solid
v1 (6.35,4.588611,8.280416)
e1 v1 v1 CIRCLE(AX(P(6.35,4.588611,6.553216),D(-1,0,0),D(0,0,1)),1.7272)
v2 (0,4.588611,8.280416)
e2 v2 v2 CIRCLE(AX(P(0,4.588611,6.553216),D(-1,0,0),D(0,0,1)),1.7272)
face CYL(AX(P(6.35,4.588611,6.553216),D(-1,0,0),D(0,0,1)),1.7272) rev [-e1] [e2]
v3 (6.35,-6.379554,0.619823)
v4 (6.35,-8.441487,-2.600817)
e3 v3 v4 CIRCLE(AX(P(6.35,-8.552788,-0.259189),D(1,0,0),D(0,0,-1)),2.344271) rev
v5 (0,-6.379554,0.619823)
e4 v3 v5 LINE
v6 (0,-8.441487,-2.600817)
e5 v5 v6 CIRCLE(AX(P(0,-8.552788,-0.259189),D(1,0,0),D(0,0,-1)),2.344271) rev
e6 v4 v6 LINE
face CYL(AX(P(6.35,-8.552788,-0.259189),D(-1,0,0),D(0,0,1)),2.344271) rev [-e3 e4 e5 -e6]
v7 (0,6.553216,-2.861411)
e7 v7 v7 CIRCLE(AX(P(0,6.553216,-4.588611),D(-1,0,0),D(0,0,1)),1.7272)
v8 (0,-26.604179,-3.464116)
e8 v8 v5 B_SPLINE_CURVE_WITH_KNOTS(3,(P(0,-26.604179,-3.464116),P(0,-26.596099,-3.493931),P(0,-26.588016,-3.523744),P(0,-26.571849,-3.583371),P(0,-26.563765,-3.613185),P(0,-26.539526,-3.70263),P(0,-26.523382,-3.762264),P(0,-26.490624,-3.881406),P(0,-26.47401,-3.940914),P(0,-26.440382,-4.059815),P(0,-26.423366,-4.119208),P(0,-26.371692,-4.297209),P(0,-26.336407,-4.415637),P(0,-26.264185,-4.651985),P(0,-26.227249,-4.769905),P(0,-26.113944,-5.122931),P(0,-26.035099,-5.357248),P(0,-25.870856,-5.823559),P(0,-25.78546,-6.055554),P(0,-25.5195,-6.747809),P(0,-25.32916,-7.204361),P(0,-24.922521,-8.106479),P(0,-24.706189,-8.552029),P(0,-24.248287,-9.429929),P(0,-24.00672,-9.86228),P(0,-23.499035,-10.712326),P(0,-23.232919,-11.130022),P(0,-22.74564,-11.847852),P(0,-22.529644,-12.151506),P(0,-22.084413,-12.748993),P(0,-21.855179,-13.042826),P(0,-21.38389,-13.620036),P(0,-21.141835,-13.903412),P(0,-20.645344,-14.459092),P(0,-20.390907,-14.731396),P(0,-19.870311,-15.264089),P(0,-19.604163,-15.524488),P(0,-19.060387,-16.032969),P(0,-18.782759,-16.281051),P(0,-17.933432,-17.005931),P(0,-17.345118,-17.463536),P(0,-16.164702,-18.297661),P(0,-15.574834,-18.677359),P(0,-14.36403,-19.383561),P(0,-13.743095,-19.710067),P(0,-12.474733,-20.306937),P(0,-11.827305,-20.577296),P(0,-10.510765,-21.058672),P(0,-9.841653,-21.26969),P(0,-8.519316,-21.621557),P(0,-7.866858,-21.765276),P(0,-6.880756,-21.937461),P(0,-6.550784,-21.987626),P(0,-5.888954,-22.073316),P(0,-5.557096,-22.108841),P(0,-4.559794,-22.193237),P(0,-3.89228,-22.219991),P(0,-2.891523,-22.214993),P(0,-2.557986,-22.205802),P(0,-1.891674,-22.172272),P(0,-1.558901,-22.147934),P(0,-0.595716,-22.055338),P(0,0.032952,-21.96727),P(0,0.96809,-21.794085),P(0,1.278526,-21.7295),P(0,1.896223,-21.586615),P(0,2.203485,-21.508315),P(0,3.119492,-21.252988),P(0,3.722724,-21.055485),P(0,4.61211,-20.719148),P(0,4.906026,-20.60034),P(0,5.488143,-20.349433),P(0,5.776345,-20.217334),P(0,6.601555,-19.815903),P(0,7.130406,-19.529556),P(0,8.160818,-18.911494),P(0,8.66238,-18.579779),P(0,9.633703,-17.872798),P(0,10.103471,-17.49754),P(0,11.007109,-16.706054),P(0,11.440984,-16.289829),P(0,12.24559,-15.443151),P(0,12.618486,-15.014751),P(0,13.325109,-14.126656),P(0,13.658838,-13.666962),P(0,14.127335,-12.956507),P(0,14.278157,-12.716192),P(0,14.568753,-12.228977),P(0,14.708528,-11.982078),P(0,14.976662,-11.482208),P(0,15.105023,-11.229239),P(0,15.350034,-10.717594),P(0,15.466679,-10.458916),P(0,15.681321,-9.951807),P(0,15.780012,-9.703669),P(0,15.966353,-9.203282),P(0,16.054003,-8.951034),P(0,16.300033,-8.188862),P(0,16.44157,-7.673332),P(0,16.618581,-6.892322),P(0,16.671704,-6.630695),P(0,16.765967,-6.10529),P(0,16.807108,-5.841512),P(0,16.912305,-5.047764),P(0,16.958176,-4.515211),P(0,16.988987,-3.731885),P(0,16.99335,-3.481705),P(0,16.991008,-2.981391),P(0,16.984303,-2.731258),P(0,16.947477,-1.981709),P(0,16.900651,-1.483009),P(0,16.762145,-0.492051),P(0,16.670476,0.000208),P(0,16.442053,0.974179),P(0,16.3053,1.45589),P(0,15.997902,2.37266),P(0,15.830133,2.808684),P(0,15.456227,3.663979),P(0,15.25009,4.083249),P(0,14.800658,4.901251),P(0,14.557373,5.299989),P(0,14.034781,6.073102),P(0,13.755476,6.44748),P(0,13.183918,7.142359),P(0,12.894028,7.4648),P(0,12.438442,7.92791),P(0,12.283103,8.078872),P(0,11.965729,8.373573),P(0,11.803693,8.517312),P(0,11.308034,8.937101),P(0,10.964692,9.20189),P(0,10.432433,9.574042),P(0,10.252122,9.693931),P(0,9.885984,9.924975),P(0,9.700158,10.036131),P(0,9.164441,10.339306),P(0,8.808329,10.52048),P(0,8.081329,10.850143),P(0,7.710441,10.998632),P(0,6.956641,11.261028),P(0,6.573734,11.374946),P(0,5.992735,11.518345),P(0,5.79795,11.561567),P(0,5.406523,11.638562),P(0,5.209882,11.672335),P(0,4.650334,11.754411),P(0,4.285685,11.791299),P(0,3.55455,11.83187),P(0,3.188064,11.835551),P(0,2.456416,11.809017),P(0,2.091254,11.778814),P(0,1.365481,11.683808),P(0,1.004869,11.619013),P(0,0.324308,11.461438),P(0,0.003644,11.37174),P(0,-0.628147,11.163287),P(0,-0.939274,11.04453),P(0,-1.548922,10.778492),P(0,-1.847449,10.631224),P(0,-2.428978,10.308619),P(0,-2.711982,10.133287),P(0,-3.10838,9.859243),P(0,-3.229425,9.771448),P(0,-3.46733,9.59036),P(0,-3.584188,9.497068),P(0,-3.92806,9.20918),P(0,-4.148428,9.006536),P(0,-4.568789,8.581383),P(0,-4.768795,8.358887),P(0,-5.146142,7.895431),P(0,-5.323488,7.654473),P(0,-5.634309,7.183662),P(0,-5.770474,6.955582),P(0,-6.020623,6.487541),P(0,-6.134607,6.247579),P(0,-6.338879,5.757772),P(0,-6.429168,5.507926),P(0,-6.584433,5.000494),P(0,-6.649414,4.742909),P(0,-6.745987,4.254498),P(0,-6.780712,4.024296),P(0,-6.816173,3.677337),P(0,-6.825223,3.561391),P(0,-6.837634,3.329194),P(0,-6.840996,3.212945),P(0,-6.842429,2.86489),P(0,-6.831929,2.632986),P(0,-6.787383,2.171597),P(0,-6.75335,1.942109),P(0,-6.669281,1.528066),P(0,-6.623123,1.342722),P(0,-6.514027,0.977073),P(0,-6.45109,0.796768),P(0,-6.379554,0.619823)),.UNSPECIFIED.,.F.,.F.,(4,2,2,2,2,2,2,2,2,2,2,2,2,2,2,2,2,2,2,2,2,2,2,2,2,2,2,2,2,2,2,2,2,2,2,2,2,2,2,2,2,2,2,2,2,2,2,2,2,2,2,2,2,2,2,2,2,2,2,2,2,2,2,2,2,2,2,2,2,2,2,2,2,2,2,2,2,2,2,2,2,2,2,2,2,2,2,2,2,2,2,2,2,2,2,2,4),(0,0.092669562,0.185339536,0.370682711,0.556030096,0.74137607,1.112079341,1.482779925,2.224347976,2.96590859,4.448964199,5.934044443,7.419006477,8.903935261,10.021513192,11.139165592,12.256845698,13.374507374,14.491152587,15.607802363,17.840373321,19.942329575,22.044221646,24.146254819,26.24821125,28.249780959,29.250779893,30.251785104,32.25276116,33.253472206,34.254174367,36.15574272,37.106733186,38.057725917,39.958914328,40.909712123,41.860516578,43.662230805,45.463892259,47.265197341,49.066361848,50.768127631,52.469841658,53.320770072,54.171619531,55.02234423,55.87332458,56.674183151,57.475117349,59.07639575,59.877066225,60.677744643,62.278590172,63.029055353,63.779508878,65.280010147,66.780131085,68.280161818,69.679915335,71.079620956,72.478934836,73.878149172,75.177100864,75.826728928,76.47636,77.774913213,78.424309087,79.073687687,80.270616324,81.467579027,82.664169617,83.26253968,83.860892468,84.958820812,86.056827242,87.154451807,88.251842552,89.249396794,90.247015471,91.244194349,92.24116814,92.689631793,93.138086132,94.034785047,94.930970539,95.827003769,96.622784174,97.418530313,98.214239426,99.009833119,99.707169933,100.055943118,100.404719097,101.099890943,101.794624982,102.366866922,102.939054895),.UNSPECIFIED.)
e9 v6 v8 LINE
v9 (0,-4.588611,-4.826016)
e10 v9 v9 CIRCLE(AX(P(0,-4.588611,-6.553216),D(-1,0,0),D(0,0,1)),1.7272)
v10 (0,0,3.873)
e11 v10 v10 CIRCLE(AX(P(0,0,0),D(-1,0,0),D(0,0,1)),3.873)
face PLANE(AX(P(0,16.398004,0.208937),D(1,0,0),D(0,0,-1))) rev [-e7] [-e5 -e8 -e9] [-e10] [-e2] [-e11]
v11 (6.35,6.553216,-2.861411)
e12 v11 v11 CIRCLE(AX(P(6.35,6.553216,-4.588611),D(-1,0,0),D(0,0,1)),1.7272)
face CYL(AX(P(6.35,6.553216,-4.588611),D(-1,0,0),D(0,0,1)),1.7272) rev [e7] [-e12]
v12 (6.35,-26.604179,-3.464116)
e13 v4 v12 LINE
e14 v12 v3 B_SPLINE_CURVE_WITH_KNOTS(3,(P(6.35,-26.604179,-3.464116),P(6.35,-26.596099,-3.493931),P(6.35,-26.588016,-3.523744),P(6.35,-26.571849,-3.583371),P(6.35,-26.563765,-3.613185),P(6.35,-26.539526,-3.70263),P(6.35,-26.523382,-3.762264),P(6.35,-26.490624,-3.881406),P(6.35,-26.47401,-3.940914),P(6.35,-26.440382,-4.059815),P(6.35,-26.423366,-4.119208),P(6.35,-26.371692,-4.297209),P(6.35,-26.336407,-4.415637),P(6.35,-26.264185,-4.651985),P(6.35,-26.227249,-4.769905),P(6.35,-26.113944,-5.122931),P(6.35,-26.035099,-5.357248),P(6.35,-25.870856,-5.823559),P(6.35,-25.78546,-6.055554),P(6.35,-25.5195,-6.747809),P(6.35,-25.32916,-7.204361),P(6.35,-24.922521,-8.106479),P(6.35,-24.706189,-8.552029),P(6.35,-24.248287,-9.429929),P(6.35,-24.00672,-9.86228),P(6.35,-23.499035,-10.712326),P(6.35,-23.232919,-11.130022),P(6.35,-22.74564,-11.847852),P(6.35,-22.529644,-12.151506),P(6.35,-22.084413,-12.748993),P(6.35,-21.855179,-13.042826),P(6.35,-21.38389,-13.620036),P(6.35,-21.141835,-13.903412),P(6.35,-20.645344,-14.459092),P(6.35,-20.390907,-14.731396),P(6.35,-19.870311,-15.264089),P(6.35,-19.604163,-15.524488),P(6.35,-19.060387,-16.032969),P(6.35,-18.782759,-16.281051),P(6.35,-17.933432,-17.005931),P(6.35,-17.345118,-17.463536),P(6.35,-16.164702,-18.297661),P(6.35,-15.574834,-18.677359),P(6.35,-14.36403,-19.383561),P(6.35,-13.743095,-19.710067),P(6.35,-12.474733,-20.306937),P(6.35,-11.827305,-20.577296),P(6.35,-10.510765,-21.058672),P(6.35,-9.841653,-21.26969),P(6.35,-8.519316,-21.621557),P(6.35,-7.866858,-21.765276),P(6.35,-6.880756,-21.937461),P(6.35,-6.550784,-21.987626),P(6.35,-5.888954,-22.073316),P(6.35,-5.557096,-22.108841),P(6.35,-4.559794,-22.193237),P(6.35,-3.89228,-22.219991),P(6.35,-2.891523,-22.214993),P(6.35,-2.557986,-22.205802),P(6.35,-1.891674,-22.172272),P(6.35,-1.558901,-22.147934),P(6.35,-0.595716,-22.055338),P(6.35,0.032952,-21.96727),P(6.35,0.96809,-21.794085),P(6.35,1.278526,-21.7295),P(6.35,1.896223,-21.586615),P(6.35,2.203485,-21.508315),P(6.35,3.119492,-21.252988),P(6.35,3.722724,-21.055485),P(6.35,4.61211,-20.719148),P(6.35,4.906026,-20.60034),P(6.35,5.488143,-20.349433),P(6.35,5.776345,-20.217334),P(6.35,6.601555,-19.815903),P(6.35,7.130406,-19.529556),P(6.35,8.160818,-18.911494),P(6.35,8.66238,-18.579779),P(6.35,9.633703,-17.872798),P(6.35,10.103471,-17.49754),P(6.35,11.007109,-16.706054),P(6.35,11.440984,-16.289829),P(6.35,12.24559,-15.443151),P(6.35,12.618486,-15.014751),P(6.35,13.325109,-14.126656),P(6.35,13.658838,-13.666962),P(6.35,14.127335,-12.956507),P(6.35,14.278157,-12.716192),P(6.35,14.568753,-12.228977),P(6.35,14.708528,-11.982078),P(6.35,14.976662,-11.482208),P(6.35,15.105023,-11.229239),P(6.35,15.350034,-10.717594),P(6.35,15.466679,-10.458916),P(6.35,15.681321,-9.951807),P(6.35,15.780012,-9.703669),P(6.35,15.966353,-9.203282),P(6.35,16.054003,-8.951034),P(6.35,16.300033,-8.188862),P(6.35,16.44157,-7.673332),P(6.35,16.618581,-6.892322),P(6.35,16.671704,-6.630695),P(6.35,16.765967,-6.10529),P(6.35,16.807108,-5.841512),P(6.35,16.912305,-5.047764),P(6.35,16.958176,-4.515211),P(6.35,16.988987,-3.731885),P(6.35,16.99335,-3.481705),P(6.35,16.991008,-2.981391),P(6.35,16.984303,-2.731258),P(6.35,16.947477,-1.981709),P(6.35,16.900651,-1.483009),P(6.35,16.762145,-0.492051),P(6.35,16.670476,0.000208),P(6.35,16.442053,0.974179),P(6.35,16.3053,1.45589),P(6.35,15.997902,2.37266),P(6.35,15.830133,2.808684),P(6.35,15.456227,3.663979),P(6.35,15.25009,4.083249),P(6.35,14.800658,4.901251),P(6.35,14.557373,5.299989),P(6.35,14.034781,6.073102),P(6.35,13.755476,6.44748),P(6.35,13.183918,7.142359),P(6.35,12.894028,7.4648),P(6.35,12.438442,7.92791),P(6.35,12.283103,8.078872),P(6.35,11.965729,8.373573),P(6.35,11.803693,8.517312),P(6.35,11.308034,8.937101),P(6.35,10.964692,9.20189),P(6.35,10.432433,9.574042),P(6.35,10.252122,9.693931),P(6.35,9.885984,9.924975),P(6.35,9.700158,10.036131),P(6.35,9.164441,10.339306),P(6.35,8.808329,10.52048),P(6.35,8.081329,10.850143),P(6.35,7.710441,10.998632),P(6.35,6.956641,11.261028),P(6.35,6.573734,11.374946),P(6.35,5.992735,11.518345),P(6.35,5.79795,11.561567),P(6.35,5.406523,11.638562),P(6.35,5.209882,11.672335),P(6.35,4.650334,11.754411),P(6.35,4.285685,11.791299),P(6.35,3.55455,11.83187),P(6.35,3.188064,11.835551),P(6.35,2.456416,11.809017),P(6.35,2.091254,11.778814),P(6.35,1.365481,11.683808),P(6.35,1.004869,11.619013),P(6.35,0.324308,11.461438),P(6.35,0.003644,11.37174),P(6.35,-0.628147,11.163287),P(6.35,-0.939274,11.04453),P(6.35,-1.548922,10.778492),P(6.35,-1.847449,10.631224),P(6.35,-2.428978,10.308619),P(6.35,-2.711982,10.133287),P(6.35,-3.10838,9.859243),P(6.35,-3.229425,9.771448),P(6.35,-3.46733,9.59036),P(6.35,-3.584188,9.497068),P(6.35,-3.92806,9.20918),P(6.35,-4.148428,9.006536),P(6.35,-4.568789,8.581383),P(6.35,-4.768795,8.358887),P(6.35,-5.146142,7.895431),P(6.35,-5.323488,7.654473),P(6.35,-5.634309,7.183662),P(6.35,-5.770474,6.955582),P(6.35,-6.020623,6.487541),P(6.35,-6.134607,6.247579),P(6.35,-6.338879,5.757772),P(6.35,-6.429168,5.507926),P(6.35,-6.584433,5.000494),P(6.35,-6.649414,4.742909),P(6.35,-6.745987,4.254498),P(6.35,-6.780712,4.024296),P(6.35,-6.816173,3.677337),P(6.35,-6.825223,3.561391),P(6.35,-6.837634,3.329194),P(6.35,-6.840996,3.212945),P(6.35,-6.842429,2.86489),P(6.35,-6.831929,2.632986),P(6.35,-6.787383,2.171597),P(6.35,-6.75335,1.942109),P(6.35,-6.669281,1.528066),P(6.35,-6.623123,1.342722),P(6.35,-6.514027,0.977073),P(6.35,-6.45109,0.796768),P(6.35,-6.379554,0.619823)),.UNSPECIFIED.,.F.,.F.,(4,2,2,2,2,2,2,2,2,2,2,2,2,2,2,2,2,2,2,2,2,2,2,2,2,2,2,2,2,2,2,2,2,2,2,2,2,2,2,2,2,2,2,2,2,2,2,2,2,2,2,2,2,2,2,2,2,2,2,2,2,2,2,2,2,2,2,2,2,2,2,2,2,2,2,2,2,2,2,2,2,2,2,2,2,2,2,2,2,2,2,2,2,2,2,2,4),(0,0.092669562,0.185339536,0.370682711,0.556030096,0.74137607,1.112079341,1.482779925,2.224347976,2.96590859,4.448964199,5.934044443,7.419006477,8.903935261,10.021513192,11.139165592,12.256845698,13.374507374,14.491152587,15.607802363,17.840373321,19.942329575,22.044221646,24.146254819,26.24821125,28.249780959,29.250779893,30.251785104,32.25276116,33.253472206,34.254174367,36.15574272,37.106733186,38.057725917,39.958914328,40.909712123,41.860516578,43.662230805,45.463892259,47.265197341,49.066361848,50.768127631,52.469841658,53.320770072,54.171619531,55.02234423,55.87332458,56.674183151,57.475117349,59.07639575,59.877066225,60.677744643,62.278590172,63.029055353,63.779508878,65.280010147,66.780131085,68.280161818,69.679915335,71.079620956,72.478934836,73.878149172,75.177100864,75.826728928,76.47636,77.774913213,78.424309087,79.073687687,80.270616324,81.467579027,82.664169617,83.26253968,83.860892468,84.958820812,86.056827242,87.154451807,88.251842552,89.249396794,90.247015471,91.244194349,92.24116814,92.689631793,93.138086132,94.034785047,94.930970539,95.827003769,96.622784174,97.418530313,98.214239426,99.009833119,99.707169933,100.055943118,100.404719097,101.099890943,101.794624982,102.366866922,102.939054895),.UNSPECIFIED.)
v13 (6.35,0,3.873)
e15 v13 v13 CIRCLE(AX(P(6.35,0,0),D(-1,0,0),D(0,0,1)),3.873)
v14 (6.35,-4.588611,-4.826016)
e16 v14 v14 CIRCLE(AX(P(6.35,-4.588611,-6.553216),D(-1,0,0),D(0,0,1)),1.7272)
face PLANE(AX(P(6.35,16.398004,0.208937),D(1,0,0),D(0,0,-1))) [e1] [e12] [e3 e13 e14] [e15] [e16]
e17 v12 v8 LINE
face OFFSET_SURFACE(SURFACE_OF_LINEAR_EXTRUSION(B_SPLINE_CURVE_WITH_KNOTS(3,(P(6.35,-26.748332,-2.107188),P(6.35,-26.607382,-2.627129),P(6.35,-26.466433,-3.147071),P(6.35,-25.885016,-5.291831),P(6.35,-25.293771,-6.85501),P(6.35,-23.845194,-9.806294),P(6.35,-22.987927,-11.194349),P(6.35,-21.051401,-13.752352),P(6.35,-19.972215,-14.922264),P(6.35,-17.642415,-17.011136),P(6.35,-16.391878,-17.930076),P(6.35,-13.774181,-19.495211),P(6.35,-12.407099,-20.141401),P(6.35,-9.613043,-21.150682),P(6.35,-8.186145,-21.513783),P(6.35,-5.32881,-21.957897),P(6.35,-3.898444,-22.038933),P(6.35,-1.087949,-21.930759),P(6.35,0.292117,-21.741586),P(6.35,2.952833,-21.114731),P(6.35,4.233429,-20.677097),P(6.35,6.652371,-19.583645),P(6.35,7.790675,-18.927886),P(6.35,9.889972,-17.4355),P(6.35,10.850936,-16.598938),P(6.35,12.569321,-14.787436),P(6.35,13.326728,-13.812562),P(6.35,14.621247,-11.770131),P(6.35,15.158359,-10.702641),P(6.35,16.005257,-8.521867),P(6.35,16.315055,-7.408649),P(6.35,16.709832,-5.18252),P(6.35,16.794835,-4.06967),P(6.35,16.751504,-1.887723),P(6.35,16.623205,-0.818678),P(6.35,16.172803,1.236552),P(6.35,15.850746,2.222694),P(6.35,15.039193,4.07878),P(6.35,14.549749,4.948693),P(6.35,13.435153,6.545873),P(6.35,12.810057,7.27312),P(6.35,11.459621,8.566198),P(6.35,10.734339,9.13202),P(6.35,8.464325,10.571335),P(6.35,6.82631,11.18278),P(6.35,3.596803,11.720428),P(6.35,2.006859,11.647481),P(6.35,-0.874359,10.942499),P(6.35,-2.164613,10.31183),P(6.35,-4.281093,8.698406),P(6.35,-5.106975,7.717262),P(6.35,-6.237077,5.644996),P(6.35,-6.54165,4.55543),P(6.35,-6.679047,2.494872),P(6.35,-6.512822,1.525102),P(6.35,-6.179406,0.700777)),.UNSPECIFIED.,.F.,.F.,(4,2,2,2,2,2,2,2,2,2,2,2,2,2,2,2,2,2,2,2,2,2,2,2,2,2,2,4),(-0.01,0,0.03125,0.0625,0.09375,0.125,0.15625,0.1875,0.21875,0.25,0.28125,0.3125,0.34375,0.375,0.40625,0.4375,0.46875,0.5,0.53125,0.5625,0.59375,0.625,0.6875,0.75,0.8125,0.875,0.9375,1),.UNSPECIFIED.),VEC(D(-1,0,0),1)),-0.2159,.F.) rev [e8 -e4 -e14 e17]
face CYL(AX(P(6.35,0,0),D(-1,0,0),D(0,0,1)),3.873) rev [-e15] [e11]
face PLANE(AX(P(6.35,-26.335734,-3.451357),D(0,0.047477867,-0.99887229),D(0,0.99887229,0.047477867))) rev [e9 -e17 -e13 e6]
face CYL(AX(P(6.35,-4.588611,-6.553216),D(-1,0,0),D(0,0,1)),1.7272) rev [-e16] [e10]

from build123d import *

# Parameters (mm, degrees)
SKETCH4_R              = 3
BOSS_EXTRUDE1_DEPTH    = 6.35
MOVE_FACE1_OUTLINE_R   = 3
MOVE_FACE1_OUTLINE_R_2 = 2.7841
MOVE_FACE1_DEPTH       = 6.35
SKETCH11_R             = 1.7272
SKETCH11_R_2           = 3.873
CUT_EXTRUDE2_DEPTH     = 36.237722546


# Read off the part's stored shape, not the designer's step: Move Face1
with BuildPart() as part:
    # Sketch4 → Boss-Extrude1 (new body)
    with BuildSketch(Plane(origin=(0, 0, 0), x_dir=(0, 0, -1), z_dir=(1, 0, 0))):
        with BuildLine():
            Line((3.667013126, -26.3254835), (2.816473307, -8.431236894))
            ThreePointArc((2.816473307, -8.431236894), (1.639602622, -6.396649217), (-0.700777066, -6.179406175))
            add(Edge.make_bspline(
                [(-0.700777066, -6.179406175), (-1.525102008, -6.512822326), (-2.494871997, -6.679047096), (-4.555429578, -6.54165034), (-5.644996058, -6.237076936), (-7.717261628, -5.106975392), (-8.698405735, -4.281093265), (-10.311829803, -2.164612563), (-10.942499326, -0.874358563), (-11.647480976, 2.006859472), (-11.720427957, 3.596803483), (-11.182779689, 6.826310345), (-10.571334953, 8.46432492), (-9.132019695, 10.73433891), (-8.566197708, 11.459621106), (-7.273120414, 12.810057002), (-6.545872807, 13.435152517), (-4.948692799, 14.549748502), (-4.078780417, 15.039192621), (-2.22269385, 15.85074605), (-1.236551533, 16.172803424), (0.818678144, 16.623204755), (1.887722789, 16.751503646), (4.069669804, 16.79483508), (5.182520117, 16.709831654), (7.408648574, 16.315055224), (8.521867273, 16.00525724), (10.70264063, 15.158359498), (11.770130786, 14.621247223), (13.812561896, 13.326727542), (14.787435905, 12.56932106), (16.598938448, 10.850935673), (17.435500393, 9.889971566), (18.927885533, 7.790674993), (19.583645356, 6.652371052), (20.677096627, 4.233429246), (21.114730733, 2.952832896), (21.741586229, 0.292117033), (21.930758945, -1.087949282), (22.038932986, -3.898444365), (21.957896657, -5.328810088), (21.513783431, -8.186144708), (21.150681858, -9.613043017), (20.141400668, -12.407098951), (19.49521083, -13.774181132), (17.930076055, -16.391877744), (17.011136269, -17.642414844), (14.922264044, -19.972214517), (13.752352434, -21.051401006), (11.194349378, -22.98792657), (9.80629411, -23.845193985), (6.855009859, -25.29377098), (5.291831431, -25.88501641), (3.667013126, -26.3254835)],
                knots=[0, 0, 0, 0, 0.0625, 0.0625, 0.125, 0.125, 0.1875, 0.1875, 0.25, 0.25, 0.3125, 0.3125, 0.375, 0.375, 0.40625, 0.40625, 0.4375, 0.4375, 0.46875, 0.46875, 0.5, 0.5, 0.53125, 0.53125, 0.5625, 0.5625, 0.59375, 0.59375, 0.625, 0.625, 0.65625, 0.65625, 0.6875, 0.6875, 0.71875, 0.71875, 0.75, 0.75, 0.78125, 0.78125, 0.8125, 0.8125, 0.84375, 0.84375, 0.875, 0.875, 0.90625, 0.90625, 0.9375, 0.9375, 0.96875, 0.96875, 1, 1, 1, 1], degree=3))
        make_face()
        Circle(SKETCH4_R, mode=Mode.SUBTRACT)
    extrude(amount=BOSS_EXTRUDE1_DEPTH)

    # Move Face1 outline → Move Face1 (add)
    # profile 1 of 2: a face of its own
    with BuildSketch(Plane.YZ):
        with BuildLine():
            Line((-8.441487365, -2.600816779), (-26.604178645, -3.464116168))
            add(Edge.make_bspline(
                [(-26.604178645, -3.464116168), (-26.599569003, -3.481120458), (-26.594959362, -3.498124748), (-26.59034972, -3.515129038), (-26.585740078, -3.532133328), (-26.581130437, -3.549137618), (-26.576520795, -3.566141908), (-26.571911153, -3.583146198), (-26.567301512, -3.600150488), (-26.56269187, -3.617154778), (-26.558082228, -3.634159068), (-26.553472587, -3.651163358), (-26.548862945, -3.668167648), (-26.544253303, -3.685171938), (-26.53927128, -3.703549889), (-26.538898899, -3.704923549), (-26.538526517, -3.70629721), (-26.538154136, -3.707670871), (-26.537781754, -3.709044531), (-26.537409373, -3.710418192), (-26.537036991, -3.711791852), (-26.53666461, -3.713165513), (-26.536292228, -3.714539173), (-26.535919847, -3.715912834), (-26.535547465, -3.717286495), (-26.535175084, -3.718660155), (-26.534802702, -3.720033816), (-26.53424413, -3.722094307), (-26.534059907, -3.722773916), (-26.533858021, -3.723518442), (-26.533727067, -3.724001851), (-26.533440048, -3.725060798), (-26.533340537, -3.725426825), (-26.533133021, -3.726192717), (-26.532893488, -3.727076218), (-26.532782162, -3.727485594), (-26.532537582, -3.728388165), (-26.532375797, -3.728983938), (-26.532180677, -3.729703197), (-26.531993743, -3.730392017), (-26.531617908, -3.731776793), (-26.531429971, -3.732469173), (-26.531242014, -3.733161545), (-26.531054038, -3.733853909), (-26.530866042, -3.734546265), (-26.530678027, -3.735238614), (-26.530489992, -3.735930954), (-26.530301938, -3.736623286), (-26.530113864, -3.73731561), (-26.529925771, -3.738007927), (-26.529737659, -3.738700235), (-26.529549527, -3.739392535), (-26.529361375, -3.740084828), (-26.528420519, -3.74354625), (-26.527667523, -3.74631526), (-26.526914215, -3.749084142), (-26.526160594, -3.751852897), (-26.525406663, -3.754621524), (-26.524652417, -3.757390023), (-26.523897864, -3.760158394), (-26.523142994, -3.762926638), (-26.522387816, -3.765694753), (-26.521632324, -3.768462741), (-26.520876522, -3.7712306), (-26.520120408, -3.773998332), (-26.519363982, -3.776765936), (-26.517093769, -3.785068362), (-26.515579047, -3.790602801), (-26.514063078, -3.796136728), (-26.512545864, -3.801670141), (-26.511027403, -3.807203041), (-26.509507697, -3.812735429), (-26.507986745, -3.818267302), (-26.506464548, -3.823798661), (-26.504941106, -3.829329506), (-26.503416418, -3.834859837), (-26.501890486, -3.840389653), (-26.500363309, -3.845918954), (-26.498834888, -3.85144774), (-26.494245891, -3.868032549), (-26.491181583, -3.879087027), (-26.488112299, -3.890139439), (-26.485038042, -3.901189785), (-26.481958812, -3.912238061), (-26.478874612, -3.923284266), (-26.475785441, -3.934328398), (-26.472691304, -3.945370453), (-26.4695922, -3.956410431), (-26.466488131, -3.967448328), (-26.463379099, -3.978484142), (-26.460265106, -3.989517871), (-26.457146153, -4.000549514), (-26.441526593, -4.055697279), (-26.428951609, -4.099782062), (-26.416297387, -4.143833272), (-26.403564026, -4.187850766), (-26.390751622, -4.2318344), (-26.377860278, -4.275784033), (-26.364890086, -4.31969952), (-26.351841151, -4.363580717), (-26.338713566, -4.407427483), (-26.325507433, -4.451239673), (-26.312222848, -4.495017144), (-26.298859911, -4.538759754), (-26.285418719, -4.582467358), (-26.217821979, -4.800829638), (-26.162494118, -4.974957082), (-26.105922065, -5.148512984), (-26.048112096, -5.321488181), (-25.989070491, -5.49387351), (-25.928803524, -5.665659807), (-25.867317478, -5.836837911), (-25.804618624, -6.007398657), (-25.740713246, -6.177332884), (-25.675607616, -6.346631428), (-25.609308015, -6.515285126), (-25.541820718, -6.683284815), (-25.473152005, -6.850621333), (-25.263620445, -7.350613883), (-25.119234857, -7.681244245), (-24.970181526, -8.009184855), (-24.816563128, -8.334008567), (-24.658405438, -8.656540908), (-24.495574442, -8.975326705), (-24.328540305, -9.291435032), (-24.157090549, -9.604622916), (-23.981161893, -9.914157206), (-23.801250109, -10.220890306), (-23.616969066, -10.524098117), (-23.428657045, -10.824036045), (-23.23626742, -11.120542818), (-22.843508974, -11.706612059), (-22.643142176, -11.996174333), (-22.438808393, -12.282198027), (-22.230723583, -12.56460565), (-22.018648797, -12.843459923), (-21.802917467, -13.118447754), (-21.583605212, -13.389644606), (-21.360601243, -13.657176078), (-21.134077845, -13.920797741), (-20.904199437, -14.180403567), (-20.670850853, -14.43621903), (-20.434249131, -14.687936687), (-20.194399706, -14.935644556), (-19.70838235, -15.42287054), (-19.462215458, -15.662397811), (-19.212931723, -15.897766285), (-18.960728671, -16.128991264), (-18.70539447, -16.355994955), (-18.447304202, -16.578625492), (-18.186499944, -16.796967202), (-17.922857209, -17.011060359), (-17.656599224, -17.220738444), (-17.387896766, -17.42596103), (-17.116588056, -17.626860373), (-16.842954408, -17.82323191), (-16.566974945, -18.015139117), (-16.010532784, -18.389907039), (-15.730066911, -18.572777232), (-15.447424653, -18.751061226), (-15.162746667, -18.924851219), (-14.875916093, -19.093949929), (-14.587276398, -19.258367365), (-14.296840097, -19.418183126), (-14.004513923, -19.573354608), (-13.710535007, -19.723805382), (-13.415054471, -19.869556513), (-13.117916757, -20.010637113), (-12.819417073, -20.146961011), (-12.519527346, -20.278558541), (-11.917189037, -20.532242336), (-11.614733643, -20.65433651), (-11.311086848, -20.771622769), (-11.006314451, -20.884236095), (-10.700430715, -20.991914806), (-10.39369458, -21.094796517), (-10.086097937, -21.192946197), (-9.777608438, -21.286263743), (-9.468444303, -21.374756831), (-9.158720169, -21.458492374), (-8.848328151, -21.537414262), (-8.537533287, -21.611545146), (-8.226317575, -21.68088471), (-7.603260387, -21.809981168), (-7.291409675, -21.869743076), (-6.979352707, -21.924681004), (-6.667077965, -21.974937355), (-6.354741362, -22.020247701), (-6.042483137, -22.060828702), (-5.730286129, -22.096726163), (-5.418195248, -22.127815836), (-5.10638259, -22.154172495), (-4.794917194, -22.175889882), (-4.483768614, -22.19285834), (-4.173135796, -22.205184806), (-3.863025065, -22.212847752), (-3.244042, -22.218898546), (-2.935160635, -22.217283683), (-2.627009812, -22.211051294), (-2.319535889, -22.200221076), (-2.012978585, -22.184764162), (-1.707390049, -22.164745089), (-1.402745405, -22.140231054), (-1.099140461, -22.111224435), (-0.796711927, -22.077727229), (-0.495491172, -22.03980106), (-0.195495425, -21.997498698), (0.103120125, -21.950796576), (0.400341286, -21.899765548), (0.991819558, -21.789077387), (1.28608355, -21.729419077), (1.578768432, -21.665496674), (1.869917455, -21.597302553), (2.159298453, -21.524877058), (2.446882891, -21.44828864), (2.732707168, -21.367584679), (3.016672969, -21.282790594), (3.298648908, -21.193943649), (3.578623787, -21.101102717), (3.85659217, -21.004314712), (4.132391722, -20.903599993), (4.406031128, -20.799020335), (4.948821205, -20.582201458), (5.217977174, -20.469959264), (5.484813738, -20.353954278), (5.749350964, -20.234161295), (6.01138819, -20.110681465), (6.270917632, -19.983580155), (6.527976619, -19.852885482), (6.782472092, -19.718646938), (7.034289441, -19.580933449), (7.283432367, -19.43979613), (7.529901875, -19.295274808), (7.77354503, -19.147434253), (8.014385292, -18.996321733), (8.490309508, -18.687660003), (8.725396651, -18.530106846), (8.957555599, -18.369412167), (9.186776625, -18.205547192), (9.412909718, -18.038656901), (9.635962414, -17.868799381), (9.855964095, -17.695988596), (10.072835585, -17.520295455), (10.286488685, -17.341812823), (10.496935081, -17.160582706), (10.704177349, -16.976639307), (10.908088748, -16.790084702), (11.108697582, -16.60095136), (11.503188846, -16.217665056), (11.697072069, -16.023508272), (11.887567215, -15.826919792), (12.074634411, -15.627883555), (12.258185431, -15.42656542), (12.438237852, -15.223014525), (12.614807781, -15.017239038), (12.787836646, -14.809325702), (12.957268738, -14.599380603), (13.123118176, -14.387438261), (13.285386007, -14.173530705), (13.443983714, -13.9577844), (13.598936774, -13.740220791), (13.901469825, -13.301617581), (14.049048428, -13.080575457), (14.192938252, -12.85786673), (14.333075884, -12.633504041), (14.469436513, -12.407648424), (14.602043246, -12.180340569), (14.730898025, -11.951592848), (14.855967044, -11.721500116), (14.977228845, -11.490169384), (15.094696526, -11.257631481), (15.208368824, -11.023920803), (15.318201343, -10.789171515), (15.424212302, -10.553400689), (15.62854924, -10.079983096), (15.726872378, -9.842336108), (15.821368333, -9.603809457), (15.911963677, -9.364456828), (15.998688398, -9.124410274), (16.081568069, -8.883704025), (16.160594519, -8.642364015), (16.235759672, -8.400484565), (16.307073362, -8.15816166), (16.374546973, -7.915427103), (16.438178826, -7.672322007), (16.497967314, -7.428970727), (16.553923089, -7.185393613), (16.658169192, -6.697950384), (16.706458163, -6.454088263), (16.750931294, -6.210116308), (16.791551227, -5.966156004), (16.828352164, -5.722265003), (16.861371473, -5.478483856), (16.89061727, -5.234873215), (16.916091026, -4.991505669), (16.937812625, -4.748444975), (16.955811803, -4.505744551), (16.970101403, -4.263463823), (16.98068149, -4.021672476), (16.987586075, -3.780425869), (16.994060031, -3.299148156), (16.993631026, -3.059123221), (16.989555385, -2.819737011), (16.981828074, -2.581119041), (16.97049256, -2.343310945), (16.955590155, -2.106340667), (16.937140606, -1.870268338), (16.91516095, -1.635166239), (16.889682937, -1.401088709), (16.860744509, -1.168076804), (16.828369507, -0.936186685), (16.792572797, -0.705489655), (16.753396921, -0.476025059), (16.668327332, -0.019684131), (16.622436928, 0.207187985), (16.573210516, 0.43274012), (16.520676595, 0.656845924), (16.464882551, 0.879479604), (16.405870334, 1.100624284), (16.3436718, 1.320223268), (16.278319602, 1.538208936), (16.209854217, 1.754538123), (16.138317988, 1.969182142), (16.063745228, 2.182090339), (15.986166539, 2.393194111), (15.905627626, 2.602469813), (15.738694717, 3.017250287), (15.652304686, 3.222753348), (15.563011722, 3.426348397), (15.470874943, 3.627923175), (15.375941264, 3.827466031), (15.27825116, 4.024968988), (15.177848129, 4.22038201), (15.074779017, 4.413646484), (14.969089842, 4.604731213), (14.860824208, 4.793618869), (14.750025822, 4.980266585), (14.6367404, 5.164613119), (14.521012434, 5.346648599), (14.284759964, 5.705997611), (14.164238936, 5.88331198), (14.041346931, 6.058244698), (13.916166576, 6.230707349), (13.788741729, 6.400699169), (13.659110682, 6.568218603), (13.527326668, 6.733225876), (13.393447683, 6.895675454), (13.257522548, 7.055547765), (13.11959423, 7.212834846), (12.979713874, 7.367503996), (12.837939646, 7.519506253), (12.694312503, 7.668841812), (12.403459758, 7.962101433), (12.256236093, 8.106028416), (12.107245062, 8.247230378), (11.956582639, 8.385649016), (11.804288588, 8.521291455), (11.65039943, 8.654160681), (11.494975113, 8.78422985), (11.338080513, 8.911469301), (11.179764974, 9.035870418), (11.020069941, 9.157432821), (10.859051406, 9.276135657), (10.696775757, 9.391945779), (10.53327979, 9.504870215), (10.348041361, 9.62863484), (10.327440973, 9.642341074), (10.306822731, 9.656001739), (10.286186731, 9.669616814), (10.265532905, 9.683186339), (10.244861188, 9.696710349), (10.224171615, 9.710188832), (10.203464367, 9.723621723), (10.182739741, 9.737008906), (10.161998068, 9.750350261), (10.141239561, 9.763645725), (10.12046411, 9.776895389), (10.099671, 9.79009961), (10.058046161, 9.81641871), (10.037217098, 9.829531834), (10.016371494, 9.842598537), (9.995509453, 9.855618821), (9.974631077, 9.868592692), (9.953736471, 9.881520152), (9.932825737, 9.894401206), (9.911898978, 9.907235857), (9.890956298, 9.920024109), (9.869997801, 9.932765967), (9.849023589, 9.945461434), (9.828033765, 9.958110514), (9.807028434, 9.97071321), (9.743966224, 10.00838216), (9.701863133, 10.033309276), (9.659699249, 10.058050905), (9.617475395, 10.082607077), (9.575192397, 10.106977826), (9.532851077, 10.131163181), (9.490452261, 10.155163174), (9.447996771, 10.178977836), (9.405485434, 10.202607198), (9.362919072, 10.226051291), (9.320298511, 10.249310147), (9.277624573, 10.272383796), (9.234898083, 10.29527227), (9.106563432, 10.363382261), (9.020800116, 10.408048353), (8.934836483, 10.451974125), (8.848679096, 10.495159823), (8.762334519, 10.537605698), (8.675809318, 10.579311995), (8.589110055, 10.620278965), (8.502243296, 10.660506853), (8.415215603, 10.699995909), (8.328033542, 10.73874638), (8.240703676, 10.776758515), (8.15323257, 10.814032561), (8.065626787, 10.850568766), (7.802425101, 10.957964605), (7.626444742, 11.026611369), (7.450004147, 11.092309662), (7.27315561, 11.155061426), (7.095951384, 11.214868552), (6.918443686, 11.271732888), (6.740684687, 11.325656229), (6.562726523, 11.376640328), (6.384621288, 11.424686885), (6.206421038, 11.469797554), (6.028177787, 11.511973941), (5.84994351, 11.551217606), (5.671770144, 11.587530057), (5.315649022, 11.654295458), (5.137728602, 11.684747226), (4.959700016, 11.712299475), (4.783019884, 11.736712222), (4.604276011, 11.758891306), (4.429464411, 11.777036031), (4.250811556, 11.793890793), (4.076436597, 11.806370641), (3.899761626, 11.817263639), (3.725133165, 11.824666119), (3.550410334, 11.829638498), (3.37648165, 11.831780195), (3.203155326, 11.831236863), (2.857881444, 11.824777298), (2.685930065, 11.818863209), (2.51470827, 11.810286856), (2.344260063, 11.799070213), (2.174629427, 11.785235191), (2.005860324, 11.768803637), (1.837996698, 11.749797331), (1.671082472, 11.728237989), (1.50516155, 11.704147262), (1.340277816, 11.677546737), (1.176475132, 11.648457935), (1.013797343, 11.616902313), (0.852288272, 11.582901263), (0.61184345, 11.528263534), (0.53200571, 11.509447542), (0.452431498, 11.490014724), (0.373262519, 11.470000825), (0.294382178, 11.449393041), (0.215797381, 11.428191413), (0.137577788, 11.406409742), (0.059709652, 11.384053465), (-0.017850954, 11.361120913), (-0.095072103, 11.33761765), (-0.171912733, 11.313553202), (-0.248433789, 11.288926884), (-0.324588602, 11.263745774), (-0.476187787, 11.21228181), (-0.551629997, 11.185999058), (-0.626711201, 11.159170067), (-0.701427774, 11.131799368), (-0.775776089, 11.103891494), (-0.849752523, 11.075450975), (-0.92335345, 11.046482344), (-0.996575245, 11.016990131), (-1.069414282, 10.986978867), (-1.141866938, 10.956453085), (-1.213929586, 10.925417316), (-1.285598602, 10.89387609), (-1.35687036, 10.86183394), (-1.569482988, 10.764218312), (-1.709621229, 10.697155476), (-1.848127108, 10.628143005), (-1.98497177, 10.557216936), (-2.120126347, 10.484413233), (-2.253561967, 10.409767786), (-2.385249746, 10.333316406), (-2.515160795, 10.255094835), (-2.643266216, 10.175138734), (-2.769537102, 10.093483694), (-2.893944539, 10.010165228), (-3.016459604, 9.925218776), (-3.137053367, 9.838679702), (-3.315018649, 9.706535092), (-3.373849905, 9.662101445), (-3.432225085, 9.617246491), (-3.489973308, 9.572127532), (-3.547384771, 9.52651408), (-3.604222119, 9.480589049), (-3.660493818, 9.43435795), (-3.716362737, 9.387700649), (-3.771715305, 9.340702599), (-3.826473613, 9.293429538), (-3.880830859, 9.245743042), (-3.934616774, 9.197770987), (-3.987913252, 9.149459099), (-4.093478067, 9.052199488), (-4.145749357, 9.003249721), (-4.19750826, 8.953985292), (-4.248753506, 8.904411497), (-4.299483825, 8.854533635), (-4.349697947, 8.804357003), (-4.399394603, 8.753886901), (-4.448572522, 8.703128624), (-4.497230434, 8.652087473), (-4.545367069, 8.600768744), (-4.592981158, 8.549177736), (-4.640071431, 8.497319746), (-4.686636617, 8.445200073), (-4.824753105, 8.288071896), (-4.914725275, 8.182294046), (-5.002581891, 8.075532644), (-5.088312844, 7.967829797), (-5.171907984, 7.859227538), (-5.253357116, 7.749767825), (-5.332650002, 7.639492543), (-5.409776362, 7.528443501), (-5.48472587, 7.416662437), (-5.55748816, 7.304191013), (-5.628052821, 7.191070818), (-5.696409398, 7.077343365), (-5.762547394, 6.963050096), (-5.890365144, 6.733414655), (-5.952053709, 6.61804774), (-6.011379226, 6.5024593), (-6.068789532, 6.385932229), (-6.123482319, 6.2698429), (-6.176476599, 6.152615371), (-6.226996856, 6.035513752), (-6.275228474, 5.918322644), (-6.321621575, 5.800380212), (-6.365473581, 5.682832438), (-6.407390636, 5.564799764), (-6.447052072, 5.446825396), (-6.484587524, 5.328765169), (-6.55536853, 5.092635858), (-6.588616961, 4.974562342), (-6.619731944, 4.856519728), (-6.64872202, 4.73854772), (-6.675595644, 4.620685966), (-6.700361191, 4.50297406), (-6.723026952, 4.385451536), (-6.743601132, 4.268157874), (-6.762091856, 4.151132495), (-6.778507164, 4.034414767), (-6.792855012, 3.918043998), (-6.805143275, 3.802059442), (-6.815379741, 3.686500296), (-6.839956872, 3.341216503), (-6.848154204, 3.113073347), (-6.848438469, 2.887099769), (-6.84084938, 2.663718746), (-6.825763132, 2.443005573), (-6.803253008, 2.225285636), (-6.773501282, 2.01082461), (-6.73678547, 1.799796855), (-6.69324338, 1.592468222), (-6.643018498, 1.389115017), (-6.586393416, 1.18991247), (-6.52346955, 0.995146747), (-6.454467342, 0.805035191), (-6.379554183, 0.619822851)],
                knots=[-0.001662915, -0.001662915, -0.001662915, -0.001662915, -0.001662915, -0.001662915, -0.001662915, -0.001662915, -0.001662915, -0.001662915, -0.001662915, -0.001662915, -0.001662915, -0.001662915, -0.001662915, -0.000136719, -0.000136719, -0.000136719, -0.000136719, -0.000136719, -0.000136719, -0.000136719, -0.000136719, -0.000136719, -0.000136719, -0.000136719, -0.000136719, -0.000136719, -1.3428e-05, -1.3428e-05, -1.3428e-05, -1.3428e-05, -1.3428e-05, -1.3428e-05, -1.3428e-05, -1.3428e-05, -1.3428e-05, -1.3428e-05, -1.3428e-05, -1.3428e-05, -1.3428e-05, 4.8218e-05, 4.8218e-05, 4.8218e-05, 4.8218e-05, 4.8218e-05, 4.8218e-05, 4.8218e-05, 4.8218e-05, 4.8218e-05, 4.8218e-05, 4.8218e-05, 4.8218e-05, 4.8218e-05, 0.000109863, 0.000109863, 0.000109863, 0.000109863, 0.000109863, 0.000109863, 0.000109863, 0.000109863, 0.000109863, 0.000109863, 0.000109863, 0.000109863, 0.000109863, 0.000356445, 0.000356445, 0.000356445, 0.000356445, 0.000356445, 0.000356445, 0.000356445, 0.000356445, 0.000356445, 0.000356445, 0.000356445, 0.000356445, 0.000356445, 0.000849609, 0.000849609, 0.000849609, 0.000849609, 0.000849609, 0.000849609, 0.000849609, 0.000849609, 0.000849609, 0.000849609, 0.000849609, 0.000849609, 0.000849609, 0.001835937, 0.001835937, 0.001835937, 0.001835937, 0.001835937, 0.001835937, 0.001835937, 0.001835937, 0.001835937, 0.001835937, 0.001835937, 0.001835937, 0.001835937, 0.00578125, 0.00578125, 0.00578125, 0.00578125, 0.00578125, 0.00578125, 0.00578125, 0.00578125, 0.00578125, 0.00578125, 0.00578125, 0.00578125, 0.00578125, 0.0215625, 0.0215625, 0.0215625, 0.0215625, 0.0215625, 0.0215625, 0.0215625, 0.0215625, 0.0215625, 0.0215625, 0.0215625, 0.0215625, 0.0215625, 0.053125, 0.053125, 0.053125, 0.053125, 0.053125, 0.053125, 0.053125, 0.053125, 0.053125, 0.053125, 0.053125, 0.053125, 0.053125, 0.0846875, 0.0846875, 0.0846875, 0.0846875, 0.0846875, 0.0846875, 0.0846875, 0.0846875, 0.0846875, 0.0846875, 0.0846875, 0.0846875, 0.0846875, 0.11625, 0.11625, 0.11625, 0.11625, 0.11625, 0.11625, 0.11625, 0.11625, 0.11625, 0.11625, 0.11625, 0.11625, 0.11625, 0.1478125, 0.1478125, 0.1478125, 0.1478125, 0.1478125, 0.1478125, 0.1478125, 0.1478125, 0.1478125, 0.1478125, 0.1478125, 0.1478125, 0.1478125, 0.179375, 0.179375, 0.179375, 0.179375, 0.179375, 0.179375, 0.179375, 0.179375, 0.179375, 0.179375, 0.179375, 0.179375, 0.179375, 0.2109375, 0.2109375, 0.2109375, 0.2109375, 0.2109375, 0.2109375, 0.2109375, 0.2109375, 0.2109375, 0.2109375, 0.2109375, 0.2109375, 0.2109375, 0.2425, 0.2425, 0.2425, 0.2425, 0.2425, 0.2425, 0.2425, 0.2425, 0.2425, 0.2425, 0.2425, 0.2425, 0.2425, 0.2740625, 0.2740625, 0.2740625, 0.2740625, 0.2740625, 0.2740625, 0.2740625, 0.2740625, 0.2740625, 0.2740625, 0.2740625, 0.2740625, 0.2740625, 0.305625, 0.305625, 0.305625, 0.305625, 0.305625, 0.305625, 0.305625, 0.305625, 0.305625, 0.305625, 0.305625, 0.305625, 0.305625, 0.3371875, 0.3371875, 0.3371875, 0.3371875, 0.3371875, 0.3371875, 0.3371875, 0.3371875, 0.3371875, 0.3371875, 0.3371875, 0.3371875, 0.3371875, 0.36875, 0.36875, 0.36875, 0.36875, 0.36875, 0.36875, 0.36875, 0.36875, 0.36875, 0.36875, 0.36875, 0.36875, 0.36875, 0.4003125, 0.4003125, 0.4003125, 0.4003125, 0.4003125, 0.4003125, 0.4003125, 0.4003125, 0.4003125, 0.4003125, 0.4003125, 0.4003125, 0.4003125, 0.431875, 0.431875, 0.431875, 0.431875, 0.431875, 0.431875, 0.431875, 0.431875, 0.431875, 0.431875, 0.431875, 0.431875, 0.431875, 0.4634375, 0.4634375, 0.4634375, 0.4634375, 0.4634375, 0.4634375, 0.4634375, 0.4634375, 0.4634375, 0.4634375, 0.4634375, 0.4634375, 0.4634375, 0.495, 0.495, 0.495, 0.495, 0.495, 0.495, 0.495, 0.495, 0.495, 0.495, 0.495, 0.495, 0.495, 0.5265625, 0.5265625, 0.5265625, 0.5265625, 0.5265625, 0.5265625, 0.5265625, 0.5265625, 0.5265625, 0.5265625, 0.5265625, 0.5265625, 0.5265625, 0.558125, 0.558125, 0.558125, 0.558125, 0.558125, 0.558125, 0.558125, 0.558125, 0.558125, 0.558125, 0.558125, 0.558125, 0.558125, 0.5896875, 0.5896875, 0.5896875, 0.5896875, 0.5896875, 0.5896875, 0.5896875, 0.5896875, 0.5896875, 0.5896875, 0.5896875, 0.5896875, 0.5896875, 0.62125, 0.62125, 0.62125, 0.62125, 0.62125, 0.62125, 0.62125, 0.62125, 0.62125, 0.62125, 0.62125, 0.62125, 0.62125, 0.625195313, 0.625195313, 0.625195313, 0.625195313, 0.625195313, 0.625195313, 0.625195313, 0.625195313, 0.625195313, 0.625195313, 0.625195313, 0.625195313, 0.625195313, 0.629140625, 0.629140625, 0.629140625, 0.629140625, 0.629140625, 0.629140625, 0.629140625, 0.629140625, 0.629140625, 0.629140625, 0.629140625, 0.629140625, 0.629140625, 0.63703125, 0.63703125, 0.63703125, 0.63703125, 0.63703125, 0.63703125, 0.63703125, 0.63703125, 0.63703125, 0.63703125, 0.63703125, 0.63703125, 0.63703125, 0.6528125, 0.6528125, 0.6528125, 0.6528125, 0.6528125, 0.6528125, 0.6528125, 0.6528125, 0.6528125, 0.6528125, 0.6528125, 0.6528125, 0.6528125, 0.684375, 0.684375, 0.684375, 0.684375, 0.684375, 0.684375, 0.684375, 0.684375, 0.684375, 0.684375, 0.684375, 0.684375, 0.684375, 0.7159375, 0.7159375, 0.7159375, 0.7159375, 0.7159375, 0.7159375, 0.7159375, 0.7159375, 0.7159375, 0.7159375, 0.7159375, 0.7159375, 0.7159375, 0.7475, 0.7475, 0.7475, 0.7475, 0.7475, 0.7475, 0.7475, 0.7475, 0.7475, 0.7475, 0.7475, 0.7475, 0.7475, 0.76328125, 0.76328125, 0.76328125, 0.76328125, 0.76328125, 0.76328125, 0.76328125, 0.76328125, 0.76328125, 0.76328125, 0.76328125, 0.76328125, 0.76328125, 0.7790625, 0.7790625, 0.7790625, 0.7790625, 0.7790625, 0.7790625, 0.7790625, 0.7790625, 0.7790625, 0.7790625, 0.7790625, 0.7790625, 0.7790625, 0.810625, 0.810625, 0.810625, 0.810625, 0.810625, 0.810625, 0.810625, 0.810625, 0.810625, 0.810625, 0.810625, 0.810625, 0.810625, 0.82640625, 0.82640625, 0.82640625, 0.82640625, 0.82640625, 0.82640625, 0.82640625, 0.82640625, 0.82640625, 0.82640625, 0.82640625, 0.82640625, 0.82640625, 0.8421875, 0.8421875, 0.8421875, 0.8421875, 0.8421875, 0.8421875, 0.8421875, 0.8421875, 0.8421875, 0.8421875, 0.8421875, 0.8421875, 0.8421875, 0.87375, 0.87375, 0.87375, 0.87375, 0.87375, 0.87375, 0.87375, 0.87375, 0.87375, 0.87375, 0.87375, 0.87375, 0.87375, 0.9053125, 0.9053125, 0.9053125, 0.9053125, 0.9053125, 0.9053125, 0.9053125, 0.9053125, 0.9053125, 0.9053125, 0.9053125, 0.9053125, 0.9053125, 0.936875, 0.936875, 0.936875, 0.936875, 0.936875, 0.936875, 0.936875, 0.936875, 0.936875, 0.936875, 0.936875, 0.936875, 0.936875, 1, 1, 1, 1, 1, 1, 1, 1, 1, 1, 1, 1, 1, 1, 1], degree=14))
            ThreePointArc((-6.379554183, 0.619822851), (-6.578477057, -1.52319194), (-8.441487365, -2.600816779))
        make_face()
        with BuildLine():
            add(Edge.make_bspline(
                [(-26.3254835, -3.667013126), (-25.88501641, -5.291831431), (-25.29377098, -6.855009859), (-23.845193985, -9.80629411), (-22.98792657, -11.194349378), (-21.051401006, -13.752352434), (-19.972214517, -14.922264044), (-17.642414844, -17.011136269), (-16.391877744, -17.930076055), (-13.774181132, -19.49521083), (-12.407098951, -20.141400668), (-9.613043017, -21.150681858), (-8.186144708, -21.513783431), (-5.328810088, -21.957896657), (-3.898444365, -22.038932986), (-1.087949282, -21.930758945), (0.292117033, -21.741586229), (2.952832896, -21.114730733), (4.233429246, -20.677096627), (6.652371052, -19.583645356), (7.790674993, -18.927885533), (9.889971566, -17.435500393), (10.850935673, -16.598938448), (12.56932106, -14.787435905), (13.326727542, -13.812561896), (14.621247223, -11.770130786), (15.158359498, -10.70264063), (16.00525724, -8.521867273), (16.315055224, -7.408648574), (16.709831654, -5.182520117), (16.79483508, -4.069669804), (16.751503646, -1.887722789), (16.623204755, -0.818678144), (16.172803424, 1.236551533), (15.85074605, 2.22269385), (15.039192621, 4.078780417), (14.549748502, 4.948692799), (13.435152517, 6.545872807), (12.810057002, 7.273120414), (11.459621106, 8.566197708), (10.73433891, 9.132019695), (8.46432492, 10.571334953), (6.826310345, 11.182779689), (3.596803483, 11.720427957), (2.006859472, 11.647480976), (-0.874358563, 10.942499326), (-2.164612563, 10.311829803), (-4.281093265, 8.698405735), (-5.106975392, 7.717261628), (-6.237076936, 5.644996058), (-6.54165034, 4.555429578), (-6.679047096, 2.494871997), (-6.512822326, 1.525102008), (-6.179406175, 0.700777066)],
                knots=[0, 0, 0, 0, 0.03125, 0.03125, 0.0625, 0.0625, 0.09375, 0.09375, 0.125, 0.125, 0.15625, 0.15625, 0.1875, 0.1875, 0.21875, 0.21875, 0.25, 0.25, 0.28125, 0.28125, 0.3125, 0.3125, 0.34375, 0.34375, 0.375, 0.375, 0.40625, 0.40625, 0.4375, 0.4375, 0.46875, 0.46875, 0.5, 0.5, 0.53125, 0.53125, 0.5625, 0.5625, 0.59375, 0.59375, 0.625, 0.625, 0.6875, 0.6875, 0.75, 0.75, 0.8125, 0.8125, 0.875, 0.875, 0.9375, 0.9375, 1, 1, 1, 1], degree=3))
            Line((-26.3254835, -3.667013126), (-8.431236894, -2.816473307))
            ThreePointArc((-8.431236894, -2.816473307), (-6.396649217, -1.639602622), (-6.179406175, 0.700777066))
        make_face(mode=Mode.SUBTRACT)
    # profile 2 of 2: a face of its own
    with BuildSketch(Plane.YZ):
        Circle(MOVE_FACE1_OUTLINE_R)
        Circle(MOVE_FACE1_OUTLINE_R_2, mode=Mode.SUBTRACT)
    extrude(amount=MOVE_FACE1_DEPTH)

    # Sketch11 → Cut-Extrude2 (cut, through all)
    with BuildSketch(Plane.ZY):
        with Locations((-6.553216354, -4.588611491)):
            Circle(SKETCH11_R)
        with Locations((-4.588611491, 6.553216354)):
            Circle(SKETCH11_R)
        with Locations((6.553216354, 4.588611491)):
            Circle(SKETCH11_R)
        Circle(SKETCH11_R_2)
    extrude(amount=-CUT_EXTRUDE2_DEPTH, mode=Mode.SUBTRACT)


solid = part.part
